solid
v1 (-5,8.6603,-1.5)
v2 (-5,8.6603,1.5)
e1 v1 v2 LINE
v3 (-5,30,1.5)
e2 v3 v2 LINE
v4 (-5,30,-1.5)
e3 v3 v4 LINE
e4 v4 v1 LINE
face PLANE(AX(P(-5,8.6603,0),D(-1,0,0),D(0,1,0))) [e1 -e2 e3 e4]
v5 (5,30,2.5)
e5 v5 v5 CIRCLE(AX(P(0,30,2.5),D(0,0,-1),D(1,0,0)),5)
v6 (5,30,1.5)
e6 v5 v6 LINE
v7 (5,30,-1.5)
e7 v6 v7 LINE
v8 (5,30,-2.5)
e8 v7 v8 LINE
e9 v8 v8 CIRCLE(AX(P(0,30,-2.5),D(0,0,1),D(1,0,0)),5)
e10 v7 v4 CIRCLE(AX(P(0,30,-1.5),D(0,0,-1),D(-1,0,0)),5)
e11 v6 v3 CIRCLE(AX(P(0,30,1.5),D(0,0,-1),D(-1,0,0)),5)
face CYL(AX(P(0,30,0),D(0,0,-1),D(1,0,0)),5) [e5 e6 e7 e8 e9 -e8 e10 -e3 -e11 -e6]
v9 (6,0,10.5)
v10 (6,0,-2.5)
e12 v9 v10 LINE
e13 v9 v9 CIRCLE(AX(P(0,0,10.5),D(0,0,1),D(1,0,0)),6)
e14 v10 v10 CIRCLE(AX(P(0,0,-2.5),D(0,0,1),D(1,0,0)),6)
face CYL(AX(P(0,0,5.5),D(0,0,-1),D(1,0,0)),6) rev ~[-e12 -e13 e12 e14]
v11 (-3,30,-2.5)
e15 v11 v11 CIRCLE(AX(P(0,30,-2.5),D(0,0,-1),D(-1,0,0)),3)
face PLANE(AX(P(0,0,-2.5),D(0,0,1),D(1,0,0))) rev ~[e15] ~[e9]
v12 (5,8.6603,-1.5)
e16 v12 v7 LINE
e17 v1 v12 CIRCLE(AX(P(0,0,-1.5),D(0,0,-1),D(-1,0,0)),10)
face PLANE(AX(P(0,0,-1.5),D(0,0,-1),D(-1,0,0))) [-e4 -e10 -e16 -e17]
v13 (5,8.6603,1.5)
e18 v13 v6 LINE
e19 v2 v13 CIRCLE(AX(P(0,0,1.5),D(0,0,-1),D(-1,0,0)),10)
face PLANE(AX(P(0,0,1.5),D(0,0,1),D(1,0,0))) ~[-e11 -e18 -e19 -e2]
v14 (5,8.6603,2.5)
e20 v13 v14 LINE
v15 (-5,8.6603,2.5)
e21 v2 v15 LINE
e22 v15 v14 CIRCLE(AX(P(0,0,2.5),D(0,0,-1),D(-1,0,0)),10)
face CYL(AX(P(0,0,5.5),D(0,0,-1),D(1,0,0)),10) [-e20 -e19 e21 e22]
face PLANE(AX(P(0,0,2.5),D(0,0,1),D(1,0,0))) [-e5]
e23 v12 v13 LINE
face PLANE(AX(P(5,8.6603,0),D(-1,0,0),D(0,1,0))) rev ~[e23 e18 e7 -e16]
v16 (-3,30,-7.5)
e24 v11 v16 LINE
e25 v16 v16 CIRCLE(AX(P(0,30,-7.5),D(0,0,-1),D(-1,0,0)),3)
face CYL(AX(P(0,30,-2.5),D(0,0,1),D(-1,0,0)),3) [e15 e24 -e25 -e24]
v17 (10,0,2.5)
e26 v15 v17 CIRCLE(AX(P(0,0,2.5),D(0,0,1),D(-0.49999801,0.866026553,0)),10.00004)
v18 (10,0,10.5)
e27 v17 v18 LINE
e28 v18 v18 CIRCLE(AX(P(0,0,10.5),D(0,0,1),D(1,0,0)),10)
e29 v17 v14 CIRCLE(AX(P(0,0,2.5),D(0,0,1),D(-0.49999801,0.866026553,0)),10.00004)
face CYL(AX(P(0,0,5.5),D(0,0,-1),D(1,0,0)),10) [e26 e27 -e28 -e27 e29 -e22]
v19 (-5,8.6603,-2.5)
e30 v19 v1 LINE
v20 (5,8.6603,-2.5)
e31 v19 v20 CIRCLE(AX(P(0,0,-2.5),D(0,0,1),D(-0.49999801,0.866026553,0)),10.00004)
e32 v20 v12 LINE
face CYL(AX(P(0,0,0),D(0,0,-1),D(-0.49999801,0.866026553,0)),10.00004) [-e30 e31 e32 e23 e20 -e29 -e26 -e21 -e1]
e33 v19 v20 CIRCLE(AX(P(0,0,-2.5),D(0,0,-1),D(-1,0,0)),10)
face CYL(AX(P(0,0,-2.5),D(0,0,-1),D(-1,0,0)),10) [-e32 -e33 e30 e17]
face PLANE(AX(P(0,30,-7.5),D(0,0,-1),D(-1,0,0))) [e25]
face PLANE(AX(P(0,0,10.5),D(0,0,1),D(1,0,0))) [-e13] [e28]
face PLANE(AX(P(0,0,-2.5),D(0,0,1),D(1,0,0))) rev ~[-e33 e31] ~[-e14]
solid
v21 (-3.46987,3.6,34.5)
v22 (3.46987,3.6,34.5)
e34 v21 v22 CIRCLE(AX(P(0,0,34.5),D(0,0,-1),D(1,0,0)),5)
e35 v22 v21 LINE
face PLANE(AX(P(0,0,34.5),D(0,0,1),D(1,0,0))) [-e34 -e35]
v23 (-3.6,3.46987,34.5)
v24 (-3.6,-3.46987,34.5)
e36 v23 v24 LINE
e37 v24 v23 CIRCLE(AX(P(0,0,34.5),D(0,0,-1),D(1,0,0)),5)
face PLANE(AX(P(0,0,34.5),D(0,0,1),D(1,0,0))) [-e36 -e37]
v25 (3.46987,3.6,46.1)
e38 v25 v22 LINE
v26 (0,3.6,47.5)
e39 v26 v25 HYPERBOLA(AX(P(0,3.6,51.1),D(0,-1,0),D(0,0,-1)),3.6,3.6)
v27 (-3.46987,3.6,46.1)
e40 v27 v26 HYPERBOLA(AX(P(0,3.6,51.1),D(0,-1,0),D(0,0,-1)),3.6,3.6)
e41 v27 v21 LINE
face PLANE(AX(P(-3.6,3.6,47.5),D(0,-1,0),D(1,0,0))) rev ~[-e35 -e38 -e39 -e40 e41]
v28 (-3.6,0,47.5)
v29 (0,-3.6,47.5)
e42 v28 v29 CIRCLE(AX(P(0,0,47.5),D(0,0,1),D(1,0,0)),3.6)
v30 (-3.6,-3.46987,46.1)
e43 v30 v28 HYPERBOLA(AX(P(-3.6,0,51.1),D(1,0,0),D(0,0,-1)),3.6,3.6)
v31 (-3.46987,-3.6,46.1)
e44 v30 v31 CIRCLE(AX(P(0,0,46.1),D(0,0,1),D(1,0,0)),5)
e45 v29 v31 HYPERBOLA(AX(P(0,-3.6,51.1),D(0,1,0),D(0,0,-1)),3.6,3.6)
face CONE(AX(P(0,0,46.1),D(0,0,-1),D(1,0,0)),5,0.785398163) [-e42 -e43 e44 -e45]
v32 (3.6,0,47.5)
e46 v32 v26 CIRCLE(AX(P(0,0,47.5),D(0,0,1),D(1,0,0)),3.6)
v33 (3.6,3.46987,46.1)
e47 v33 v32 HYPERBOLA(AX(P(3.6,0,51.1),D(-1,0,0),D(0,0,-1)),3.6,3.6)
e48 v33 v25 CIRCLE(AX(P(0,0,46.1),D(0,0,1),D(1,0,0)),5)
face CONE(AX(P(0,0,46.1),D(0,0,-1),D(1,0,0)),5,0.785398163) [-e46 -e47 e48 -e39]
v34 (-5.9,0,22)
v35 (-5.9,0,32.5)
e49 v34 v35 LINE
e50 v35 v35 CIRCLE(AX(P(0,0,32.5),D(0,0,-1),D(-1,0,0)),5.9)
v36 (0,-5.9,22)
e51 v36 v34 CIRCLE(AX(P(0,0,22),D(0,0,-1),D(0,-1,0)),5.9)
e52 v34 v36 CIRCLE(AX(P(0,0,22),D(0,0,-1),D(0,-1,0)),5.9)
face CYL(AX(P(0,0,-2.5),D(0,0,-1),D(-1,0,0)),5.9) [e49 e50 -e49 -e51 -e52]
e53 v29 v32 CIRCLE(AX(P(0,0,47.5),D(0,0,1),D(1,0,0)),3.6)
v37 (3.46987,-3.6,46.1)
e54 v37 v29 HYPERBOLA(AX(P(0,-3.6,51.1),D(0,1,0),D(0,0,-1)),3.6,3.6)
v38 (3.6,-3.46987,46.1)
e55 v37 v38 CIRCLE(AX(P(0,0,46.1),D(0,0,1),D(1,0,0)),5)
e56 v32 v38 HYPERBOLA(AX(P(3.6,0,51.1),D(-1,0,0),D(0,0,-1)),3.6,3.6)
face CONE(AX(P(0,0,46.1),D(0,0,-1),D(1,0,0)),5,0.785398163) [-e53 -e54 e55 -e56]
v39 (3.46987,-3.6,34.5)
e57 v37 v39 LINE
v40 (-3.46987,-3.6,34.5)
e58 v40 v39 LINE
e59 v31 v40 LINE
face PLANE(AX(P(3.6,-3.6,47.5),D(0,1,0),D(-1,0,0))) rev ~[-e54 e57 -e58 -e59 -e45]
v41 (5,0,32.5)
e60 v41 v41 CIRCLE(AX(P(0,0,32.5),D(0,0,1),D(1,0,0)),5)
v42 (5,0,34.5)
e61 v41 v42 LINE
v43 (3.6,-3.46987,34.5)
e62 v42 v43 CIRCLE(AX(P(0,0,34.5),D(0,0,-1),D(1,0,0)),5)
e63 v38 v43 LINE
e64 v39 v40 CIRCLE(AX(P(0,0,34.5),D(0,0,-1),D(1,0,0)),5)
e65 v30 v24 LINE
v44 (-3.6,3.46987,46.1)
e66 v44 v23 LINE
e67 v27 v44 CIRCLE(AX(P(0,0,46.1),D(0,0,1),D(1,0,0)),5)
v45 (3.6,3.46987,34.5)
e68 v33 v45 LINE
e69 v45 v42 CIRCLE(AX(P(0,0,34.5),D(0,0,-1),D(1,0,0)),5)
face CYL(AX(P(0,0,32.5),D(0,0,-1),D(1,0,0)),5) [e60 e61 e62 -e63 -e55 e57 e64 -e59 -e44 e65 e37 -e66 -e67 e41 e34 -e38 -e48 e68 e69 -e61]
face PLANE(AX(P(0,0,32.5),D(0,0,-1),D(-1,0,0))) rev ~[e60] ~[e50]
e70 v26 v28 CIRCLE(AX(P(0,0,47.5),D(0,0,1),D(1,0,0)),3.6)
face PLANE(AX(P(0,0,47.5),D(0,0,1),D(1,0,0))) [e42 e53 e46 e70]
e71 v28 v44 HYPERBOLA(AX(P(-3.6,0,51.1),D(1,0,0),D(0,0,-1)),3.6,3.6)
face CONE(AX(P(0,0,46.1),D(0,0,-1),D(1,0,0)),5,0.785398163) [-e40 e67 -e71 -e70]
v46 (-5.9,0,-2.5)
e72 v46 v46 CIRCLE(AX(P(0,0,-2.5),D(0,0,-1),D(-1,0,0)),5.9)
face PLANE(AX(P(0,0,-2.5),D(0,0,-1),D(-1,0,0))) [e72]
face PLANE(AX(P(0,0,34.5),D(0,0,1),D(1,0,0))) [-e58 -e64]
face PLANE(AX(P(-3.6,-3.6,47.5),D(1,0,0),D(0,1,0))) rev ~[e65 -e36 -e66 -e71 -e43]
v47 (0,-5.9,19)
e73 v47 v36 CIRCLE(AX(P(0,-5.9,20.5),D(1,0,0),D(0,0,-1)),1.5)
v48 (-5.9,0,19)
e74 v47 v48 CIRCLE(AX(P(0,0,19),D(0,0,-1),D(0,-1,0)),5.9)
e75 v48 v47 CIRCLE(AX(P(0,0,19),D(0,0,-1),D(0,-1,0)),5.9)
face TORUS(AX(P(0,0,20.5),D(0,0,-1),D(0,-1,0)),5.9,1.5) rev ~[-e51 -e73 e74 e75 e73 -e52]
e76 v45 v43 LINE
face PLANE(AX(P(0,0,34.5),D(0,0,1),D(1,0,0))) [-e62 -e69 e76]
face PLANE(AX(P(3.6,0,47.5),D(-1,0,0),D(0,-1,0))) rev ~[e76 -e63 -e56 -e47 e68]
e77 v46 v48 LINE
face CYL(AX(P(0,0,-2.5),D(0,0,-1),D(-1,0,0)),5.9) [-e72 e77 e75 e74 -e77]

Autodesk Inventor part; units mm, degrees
ref_plane "YZ Plane" through (0, 0, 0) normal (1, 0, 0) x (0, 1, 0)
ref_plane "XZ Plane" through (0, 0, 0) normal (0, 1, 0) x (-1, 0, 0)
ref_plane "XY Plane" through (0, 0, 0) normal (0, 0, 1) x (1, 0, 0)
sketch "Sketch1" plane through (0, 0, 0) normal (0, 0, 1) x (1, 0, 0)
  circle A0 centre (0, 0) radius 6
  arc A1 (-5, 8.6603) -> (5, 8.6603) centre (0, 0) ccw
  line L0 (0, 0) -> (0, 30) construction
  circle A2 centre (0, 30) radius 3 construction
  arc A3 (5, 30) -> (-5, 30) centre (0, 30) ccw
  line L1 (-5, 8.6603) -> (-5, 30)
  line L2 (5, 8.6603) -> (5, 30)
  dimension "d0" = 30
  dimension "d1" = 6
  dimension "d2" = 10
  dimension "d3" = 12
  dimension "d4" = 20
extrude "Extrusion1" add sketch "Sketch1" along normal mid plane 5
sketch "Sketch2" plane through (0, 0, -2.5) normal (0, 0, -1) x (-1, 0, 0)
  arc A0 (-5, 8.6603) -> (5, 8.6603) centre (0, 0) ccw projected
  line L0 (5, 30) -> (5, 8.6603) projected
  arc A1 (5, 30) -> (-5, 30) centre (0, 30) ccw projected
  line L1 (-5, 8.6603) -> (-5, 30) projected
  circle A2 centre (0, 0) radius 10
  circle A3 centre (0, 30) radius 5
extrude "Extrusion2" cut sketch "Sketch2" against normal blind 1 contours L1 A3 L0 A2
mirror "Mirror1" about plane through (0, 0, 0) normal (0, 0, 1) of "Extrusion2"
sketch "Sketch3" plane through (0, 0, 2.5) normal (0, 0, 1) x (1, 0, 0)
  circle A0 centre (0, 0) radius 6 projected
  circle A1 centre (0, 0) radius 10 projected
extrude "Extrusion3" add sketch "Sketch3" along normal blind 3
sketch "Sketch4" plane through (0, 0, -2.5) normal (0, 0, -1) x (-1, 0, 0)
  circle A0 centre (0, 0) radius 6 projected
  circle A1 centre (0, 0) radius 5.9
  dimension "d12" = 0.1
extrude "Extrusion4" add sketch "Sketch4" against normal blind 35 contours A1
sketch "Sketch5" plane through (0, 30, -2.5) normal (0, 0, -1) x (-1, 0, 0)
  circle A0 centre (0, 0) radius 5 projected
  circle A1 centre (0, 0) radius 3
  dimension "d15" = 6
extrude "Extrusion5" add sketch "Sketch5" along normal blind 5 contours A1
sketch "Sketch6" plane through (0, 0, 32.5) normal (0, 0, 1) x (1, 0, 0)
  circle A0 centre (0, 0) radius 5.9 projected
  circle A1 centre (0, 0) radius 5
  dimension "d18" = 10
extrude "Extrusion6" add sketch "Sketch6" along normal blind 15 contours A1
chamfer "Chamfer1" distance 1.4 angle 45 1 edges at (-5, 0, 47.5)
sketch "Sketch7" plane through (0, 0, 47.5) normal (0, 0, 1) x (1, 0, 0)
  circle A0 centre (0, 0) radius 3.6 projected
  line L0 (3.6, 3.6) -> (3.6, -3.6)
  line L1 (3.6, -3.6) -> (-3.6, -3.6)
  line L2 (-3.6, -3.6) -> (-3.6, 3.6)
  line L3 (-3.6, 3.6) -> (3.6, 3.6)
  circle A1 centre (0, 0) radius 7.459
  point P0 (0, 3.6)
extrude "Extrusion7" cut sketch "Sketch7" against normal blind 13
sketch "Sketch8" plane through (0, 0, 0) normal (0, 1, 0) x (-1, 0, 0)
  point P0 (0, 0)
sketch "Sketch9" plane through (0, 0, 0) normal (1, 0, 0) x (0, 1, 0)
  line L0 (-5.9, 32.5) -> (5.9, 32.5) projected
  line L1 (-5.9, -2.5) -> (-5.9, 32.5) projected
  line L2 (5.9, -2.5) -> (5.9, 32.5) projected
  line L3 (-5, 32.5) -> (5, 32.5) projected
  line L4 (0, 32.5) -> (0, 20.5) construction
  line L5 (0, 20.5) -> (-5.9, 20.5) construction
  circle A0 centre (-5.9, 20.5) radius 1.5
  point P0 (0, 0)
  dimension "d26" = 3
  dimension "d27" = 12
revolve "Revolution1" cut sketch "Sketch9" angle 360 about axis through (0, 0, 32.5) along (0, 0, -1)
sketch "Sketch10" plane through (0, 0, 5.5) normal (0, 0, 1) x (1, 0, 0)
  circle A0 centre (0, 0) radius 6 projected
  circle A1 centre (0, 0) radius 10 projected
extrude "Extrusion8" add sketch "Sketch10" along normal blind 5
properties part number "Crank" material "Acero, carbono"
